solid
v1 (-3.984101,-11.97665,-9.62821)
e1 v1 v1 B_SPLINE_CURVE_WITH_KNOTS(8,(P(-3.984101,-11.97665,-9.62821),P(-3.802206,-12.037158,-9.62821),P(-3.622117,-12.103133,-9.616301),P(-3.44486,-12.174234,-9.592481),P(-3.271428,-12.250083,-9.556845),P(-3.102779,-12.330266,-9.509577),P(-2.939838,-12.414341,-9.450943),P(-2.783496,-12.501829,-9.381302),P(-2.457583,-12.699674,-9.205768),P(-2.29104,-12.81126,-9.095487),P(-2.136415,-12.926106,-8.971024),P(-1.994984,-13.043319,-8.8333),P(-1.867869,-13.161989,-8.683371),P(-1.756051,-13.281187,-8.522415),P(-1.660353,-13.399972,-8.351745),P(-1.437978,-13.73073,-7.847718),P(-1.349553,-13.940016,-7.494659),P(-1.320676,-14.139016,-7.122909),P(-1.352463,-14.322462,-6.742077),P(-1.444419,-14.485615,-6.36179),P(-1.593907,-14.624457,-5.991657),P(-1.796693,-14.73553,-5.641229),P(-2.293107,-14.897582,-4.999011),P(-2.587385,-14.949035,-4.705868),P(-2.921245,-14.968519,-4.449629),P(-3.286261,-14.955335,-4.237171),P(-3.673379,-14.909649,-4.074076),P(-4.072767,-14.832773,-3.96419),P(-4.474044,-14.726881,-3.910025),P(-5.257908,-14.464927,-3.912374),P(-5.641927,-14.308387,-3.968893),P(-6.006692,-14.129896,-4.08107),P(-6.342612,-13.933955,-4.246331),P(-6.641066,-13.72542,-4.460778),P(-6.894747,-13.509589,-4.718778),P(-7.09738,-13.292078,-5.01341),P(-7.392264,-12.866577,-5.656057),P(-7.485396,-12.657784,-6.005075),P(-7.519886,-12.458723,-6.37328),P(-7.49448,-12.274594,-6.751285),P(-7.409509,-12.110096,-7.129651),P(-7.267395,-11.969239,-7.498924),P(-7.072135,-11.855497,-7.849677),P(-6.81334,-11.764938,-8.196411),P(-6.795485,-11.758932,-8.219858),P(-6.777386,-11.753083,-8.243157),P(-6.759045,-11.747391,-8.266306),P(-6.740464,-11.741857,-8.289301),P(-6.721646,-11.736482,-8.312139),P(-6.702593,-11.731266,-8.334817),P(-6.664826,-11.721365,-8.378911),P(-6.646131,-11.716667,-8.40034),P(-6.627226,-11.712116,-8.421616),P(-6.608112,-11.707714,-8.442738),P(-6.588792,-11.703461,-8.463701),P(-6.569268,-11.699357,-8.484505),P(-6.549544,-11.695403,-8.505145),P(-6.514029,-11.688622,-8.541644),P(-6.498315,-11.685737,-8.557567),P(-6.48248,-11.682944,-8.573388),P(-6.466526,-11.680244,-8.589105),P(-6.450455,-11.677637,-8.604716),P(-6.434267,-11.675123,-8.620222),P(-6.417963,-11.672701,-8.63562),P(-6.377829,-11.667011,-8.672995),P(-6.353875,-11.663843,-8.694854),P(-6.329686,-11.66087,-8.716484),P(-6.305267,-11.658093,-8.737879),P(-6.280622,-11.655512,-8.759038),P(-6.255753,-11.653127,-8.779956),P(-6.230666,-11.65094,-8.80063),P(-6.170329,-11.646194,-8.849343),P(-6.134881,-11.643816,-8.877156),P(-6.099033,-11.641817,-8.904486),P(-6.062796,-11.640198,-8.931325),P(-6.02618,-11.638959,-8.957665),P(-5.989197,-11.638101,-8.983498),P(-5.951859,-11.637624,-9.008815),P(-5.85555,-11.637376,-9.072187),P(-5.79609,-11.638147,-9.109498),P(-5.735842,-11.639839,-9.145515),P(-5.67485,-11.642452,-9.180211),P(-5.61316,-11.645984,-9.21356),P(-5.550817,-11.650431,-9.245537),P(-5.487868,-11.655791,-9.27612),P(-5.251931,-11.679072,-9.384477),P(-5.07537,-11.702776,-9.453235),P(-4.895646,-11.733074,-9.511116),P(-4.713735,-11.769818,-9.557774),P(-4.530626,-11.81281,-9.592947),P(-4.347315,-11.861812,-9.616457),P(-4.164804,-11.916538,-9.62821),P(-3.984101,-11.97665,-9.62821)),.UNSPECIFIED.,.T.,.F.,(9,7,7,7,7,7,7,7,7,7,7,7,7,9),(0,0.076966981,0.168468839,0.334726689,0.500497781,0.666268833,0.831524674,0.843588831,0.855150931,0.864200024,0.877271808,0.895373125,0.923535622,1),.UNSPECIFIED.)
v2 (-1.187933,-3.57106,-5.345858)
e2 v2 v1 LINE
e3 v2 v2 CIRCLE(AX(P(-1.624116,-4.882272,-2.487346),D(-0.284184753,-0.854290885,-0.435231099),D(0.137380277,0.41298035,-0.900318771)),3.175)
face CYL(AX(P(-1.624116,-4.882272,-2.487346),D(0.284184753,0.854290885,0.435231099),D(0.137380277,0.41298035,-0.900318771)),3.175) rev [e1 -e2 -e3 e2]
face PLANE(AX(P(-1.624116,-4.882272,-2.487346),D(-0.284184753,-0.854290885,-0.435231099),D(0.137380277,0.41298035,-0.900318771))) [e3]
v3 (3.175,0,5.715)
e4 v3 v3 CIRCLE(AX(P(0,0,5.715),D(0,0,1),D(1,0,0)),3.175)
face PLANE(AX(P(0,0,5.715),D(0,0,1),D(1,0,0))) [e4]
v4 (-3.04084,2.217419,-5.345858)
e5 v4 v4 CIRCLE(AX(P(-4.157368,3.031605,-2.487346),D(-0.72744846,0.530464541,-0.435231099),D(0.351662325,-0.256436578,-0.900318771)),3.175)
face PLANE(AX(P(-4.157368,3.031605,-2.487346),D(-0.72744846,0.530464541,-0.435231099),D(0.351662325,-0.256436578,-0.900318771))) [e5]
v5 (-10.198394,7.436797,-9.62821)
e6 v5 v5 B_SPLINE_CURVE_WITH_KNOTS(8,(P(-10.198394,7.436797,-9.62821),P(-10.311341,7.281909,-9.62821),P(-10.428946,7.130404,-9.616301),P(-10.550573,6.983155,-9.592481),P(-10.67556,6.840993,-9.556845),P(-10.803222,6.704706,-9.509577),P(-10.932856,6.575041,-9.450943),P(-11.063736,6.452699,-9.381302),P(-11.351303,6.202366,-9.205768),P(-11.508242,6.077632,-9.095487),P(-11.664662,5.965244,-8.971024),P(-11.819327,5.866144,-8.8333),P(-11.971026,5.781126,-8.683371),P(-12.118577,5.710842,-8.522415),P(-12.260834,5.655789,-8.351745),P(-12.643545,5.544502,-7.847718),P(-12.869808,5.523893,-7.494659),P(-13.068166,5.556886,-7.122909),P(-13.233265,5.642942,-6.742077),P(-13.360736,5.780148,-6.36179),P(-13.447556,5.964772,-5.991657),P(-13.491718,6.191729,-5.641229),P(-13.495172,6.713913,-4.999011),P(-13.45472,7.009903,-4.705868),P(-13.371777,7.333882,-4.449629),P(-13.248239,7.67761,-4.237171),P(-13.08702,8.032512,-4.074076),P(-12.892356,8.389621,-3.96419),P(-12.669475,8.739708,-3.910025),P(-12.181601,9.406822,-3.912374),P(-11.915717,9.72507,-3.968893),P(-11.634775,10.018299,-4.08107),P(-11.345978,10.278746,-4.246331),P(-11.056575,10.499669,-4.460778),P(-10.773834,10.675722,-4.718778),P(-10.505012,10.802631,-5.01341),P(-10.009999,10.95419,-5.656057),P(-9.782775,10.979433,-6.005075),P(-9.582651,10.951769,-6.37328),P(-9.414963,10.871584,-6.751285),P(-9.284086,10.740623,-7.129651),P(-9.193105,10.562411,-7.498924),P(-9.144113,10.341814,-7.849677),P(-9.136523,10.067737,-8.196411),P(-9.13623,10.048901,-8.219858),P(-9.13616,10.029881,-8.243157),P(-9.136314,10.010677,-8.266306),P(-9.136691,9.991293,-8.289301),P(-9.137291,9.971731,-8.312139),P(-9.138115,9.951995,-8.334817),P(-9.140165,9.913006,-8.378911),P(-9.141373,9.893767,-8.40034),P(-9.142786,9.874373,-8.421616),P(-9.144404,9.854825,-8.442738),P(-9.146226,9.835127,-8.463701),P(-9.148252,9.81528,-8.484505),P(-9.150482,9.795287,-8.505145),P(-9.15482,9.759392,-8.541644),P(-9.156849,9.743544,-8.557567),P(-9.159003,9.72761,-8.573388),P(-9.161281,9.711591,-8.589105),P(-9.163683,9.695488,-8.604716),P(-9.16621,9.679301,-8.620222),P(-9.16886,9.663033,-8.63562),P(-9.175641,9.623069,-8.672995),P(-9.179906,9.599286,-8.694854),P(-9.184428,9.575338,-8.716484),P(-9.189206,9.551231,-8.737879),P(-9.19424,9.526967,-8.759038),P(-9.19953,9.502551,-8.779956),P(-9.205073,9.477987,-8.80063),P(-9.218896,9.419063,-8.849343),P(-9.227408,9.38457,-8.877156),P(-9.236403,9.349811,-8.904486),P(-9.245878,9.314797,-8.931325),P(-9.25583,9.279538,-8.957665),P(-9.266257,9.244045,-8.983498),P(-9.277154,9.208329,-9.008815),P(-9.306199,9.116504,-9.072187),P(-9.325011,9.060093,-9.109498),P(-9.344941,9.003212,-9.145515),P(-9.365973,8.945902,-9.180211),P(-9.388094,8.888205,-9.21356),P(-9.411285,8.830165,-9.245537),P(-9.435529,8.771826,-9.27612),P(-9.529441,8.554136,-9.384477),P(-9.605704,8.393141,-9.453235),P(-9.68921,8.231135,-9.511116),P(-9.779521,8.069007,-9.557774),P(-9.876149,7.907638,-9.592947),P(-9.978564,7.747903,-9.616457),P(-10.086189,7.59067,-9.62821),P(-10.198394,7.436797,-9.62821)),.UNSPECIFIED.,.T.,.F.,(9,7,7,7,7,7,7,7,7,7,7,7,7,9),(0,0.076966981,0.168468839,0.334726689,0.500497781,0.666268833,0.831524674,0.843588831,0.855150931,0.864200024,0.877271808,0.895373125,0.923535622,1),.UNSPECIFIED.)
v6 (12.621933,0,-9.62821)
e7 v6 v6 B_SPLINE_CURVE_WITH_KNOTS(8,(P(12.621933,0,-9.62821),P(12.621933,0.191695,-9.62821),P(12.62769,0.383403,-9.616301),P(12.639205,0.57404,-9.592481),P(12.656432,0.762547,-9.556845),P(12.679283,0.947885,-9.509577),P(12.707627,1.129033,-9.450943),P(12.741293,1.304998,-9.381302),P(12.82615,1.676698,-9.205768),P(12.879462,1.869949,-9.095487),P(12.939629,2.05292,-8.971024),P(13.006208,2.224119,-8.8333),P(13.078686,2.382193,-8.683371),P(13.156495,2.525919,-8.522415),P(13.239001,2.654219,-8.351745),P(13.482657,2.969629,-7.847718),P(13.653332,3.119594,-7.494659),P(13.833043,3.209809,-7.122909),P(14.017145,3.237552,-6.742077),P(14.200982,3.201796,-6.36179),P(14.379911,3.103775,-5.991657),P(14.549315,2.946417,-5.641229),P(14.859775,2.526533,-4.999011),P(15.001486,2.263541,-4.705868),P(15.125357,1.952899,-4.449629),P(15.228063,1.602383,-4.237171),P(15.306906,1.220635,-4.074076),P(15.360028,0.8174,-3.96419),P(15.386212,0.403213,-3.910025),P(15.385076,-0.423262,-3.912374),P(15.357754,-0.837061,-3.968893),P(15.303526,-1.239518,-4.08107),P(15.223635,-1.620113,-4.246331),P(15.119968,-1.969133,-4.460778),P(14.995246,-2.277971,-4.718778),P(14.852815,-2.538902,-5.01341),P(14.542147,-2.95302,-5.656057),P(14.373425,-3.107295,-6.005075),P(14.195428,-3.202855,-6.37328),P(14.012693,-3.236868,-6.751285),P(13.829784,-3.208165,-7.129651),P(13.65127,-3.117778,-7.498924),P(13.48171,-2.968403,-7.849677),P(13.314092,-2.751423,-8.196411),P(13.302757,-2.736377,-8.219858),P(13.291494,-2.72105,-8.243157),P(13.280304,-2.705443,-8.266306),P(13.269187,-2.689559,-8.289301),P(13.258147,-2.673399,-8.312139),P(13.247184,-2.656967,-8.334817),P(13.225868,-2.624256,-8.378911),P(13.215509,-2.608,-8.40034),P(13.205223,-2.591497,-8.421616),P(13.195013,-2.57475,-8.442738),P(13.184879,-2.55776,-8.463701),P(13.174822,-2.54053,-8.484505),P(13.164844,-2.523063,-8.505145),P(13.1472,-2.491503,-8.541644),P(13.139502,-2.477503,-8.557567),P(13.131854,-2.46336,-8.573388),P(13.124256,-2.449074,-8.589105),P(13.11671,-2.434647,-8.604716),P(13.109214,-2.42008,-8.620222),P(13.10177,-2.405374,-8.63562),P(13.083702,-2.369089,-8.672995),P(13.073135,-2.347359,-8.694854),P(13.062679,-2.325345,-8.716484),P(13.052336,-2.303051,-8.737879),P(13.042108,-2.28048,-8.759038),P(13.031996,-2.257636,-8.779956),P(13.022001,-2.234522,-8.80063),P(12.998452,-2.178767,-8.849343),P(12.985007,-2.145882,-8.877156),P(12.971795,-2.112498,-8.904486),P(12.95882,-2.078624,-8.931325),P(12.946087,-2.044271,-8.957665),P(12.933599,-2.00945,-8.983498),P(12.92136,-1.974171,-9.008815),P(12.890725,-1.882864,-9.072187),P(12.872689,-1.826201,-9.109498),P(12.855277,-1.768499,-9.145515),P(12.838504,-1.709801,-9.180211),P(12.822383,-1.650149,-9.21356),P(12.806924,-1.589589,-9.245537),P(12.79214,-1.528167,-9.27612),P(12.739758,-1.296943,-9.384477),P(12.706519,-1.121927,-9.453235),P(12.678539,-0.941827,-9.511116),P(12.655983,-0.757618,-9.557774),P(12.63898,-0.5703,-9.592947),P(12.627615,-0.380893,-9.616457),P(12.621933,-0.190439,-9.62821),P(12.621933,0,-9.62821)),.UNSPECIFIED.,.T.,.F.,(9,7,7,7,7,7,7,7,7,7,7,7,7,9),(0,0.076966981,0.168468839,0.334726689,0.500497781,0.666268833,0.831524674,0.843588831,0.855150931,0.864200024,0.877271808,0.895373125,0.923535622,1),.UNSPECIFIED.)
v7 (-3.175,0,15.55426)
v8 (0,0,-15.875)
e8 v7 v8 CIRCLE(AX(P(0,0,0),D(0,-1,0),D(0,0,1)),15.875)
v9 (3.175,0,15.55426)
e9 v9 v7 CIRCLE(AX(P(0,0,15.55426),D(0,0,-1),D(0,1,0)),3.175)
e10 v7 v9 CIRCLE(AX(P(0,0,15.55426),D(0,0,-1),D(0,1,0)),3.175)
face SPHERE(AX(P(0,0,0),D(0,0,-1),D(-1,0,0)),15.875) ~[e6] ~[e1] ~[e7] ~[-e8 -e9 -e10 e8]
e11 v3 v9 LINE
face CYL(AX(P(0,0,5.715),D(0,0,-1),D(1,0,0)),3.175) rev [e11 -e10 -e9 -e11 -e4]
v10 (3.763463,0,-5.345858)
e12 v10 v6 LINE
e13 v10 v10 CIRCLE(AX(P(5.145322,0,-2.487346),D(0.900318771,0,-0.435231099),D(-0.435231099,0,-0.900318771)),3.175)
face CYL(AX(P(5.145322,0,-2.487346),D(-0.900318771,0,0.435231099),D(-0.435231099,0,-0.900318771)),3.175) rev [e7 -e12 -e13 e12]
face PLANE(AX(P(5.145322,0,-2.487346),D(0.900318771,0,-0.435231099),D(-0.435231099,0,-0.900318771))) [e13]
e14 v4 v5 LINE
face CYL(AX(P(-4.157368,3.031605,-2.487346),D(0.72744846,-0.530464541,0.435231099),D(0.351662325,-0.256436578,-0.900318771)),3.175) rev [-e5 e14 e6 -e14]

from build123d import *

# Parameters (mm, degrees)
F5_R      = 3.175
F6_DEPTH  = 50.8
F9_ANGLE  = 115.8
F10_ANGLE = 108.4
F11_ANGLE = 107.7


# Not quite as in the source:
# - a length typed as a fraction of an inch, garbled in the dataset ("3 / 203.2 mm" for 3/8 in), is restored


with BuildPart() as f2:
    # F0 (on Front) → F2 (revolve)
    with BuildSketch(Plane.XZ):
        with BuildLine():
            Line((0, -15.875), (0, 15.875))
            ThreePointArc((0, 15.875), (-15.875, 0), (0, -15.875))
        make_face()
    revolve(axis=Axis((0, 0, 0), (0, 0, 1)))


with BuildPart() as f6:
    # F5 (on offset) → F6 (new body)
    with BuildSketch(Plane.XY.offset(5.715)):
        Circle(F5_R)
    extrude(amount=F6_DEPTH)


with BuildPart() as f9_1:
    # F9: copy of F6
    add(f6.part.rotate(Axis((0, 33.8576585054, 0), (0, 1, 0)), F9_ANGLE))


with BuildPart() as f10_1:
    # F10: copy of F9_1
    add(f9_1.part.rotate(Axis((0, 0, -28.0886162072), (0, 0, -1)), F10_ANGLE))


with BuildPart() as f11_1:
    # F11: copy of F10_1
    add(f10_1.part.rotate(Axis((0, 0, -28.0886162072), (0, 0, -1)), F11_ANGLE))


with BuildPart() as f2_1:
    add(f2.part)

    # F12: cut F6, F10_1, F11_1, F9_1
    add(f6.part, mode=Mode.SUBTRACT)
    add(f10_1.part, mode=Mode.SUBTRACT)
    add(f11_1.part, mode=Mode.SUBTRACT)
    add(f9_1.part, mode=Mode.SUBTRACT)


solid = f2_1.part
